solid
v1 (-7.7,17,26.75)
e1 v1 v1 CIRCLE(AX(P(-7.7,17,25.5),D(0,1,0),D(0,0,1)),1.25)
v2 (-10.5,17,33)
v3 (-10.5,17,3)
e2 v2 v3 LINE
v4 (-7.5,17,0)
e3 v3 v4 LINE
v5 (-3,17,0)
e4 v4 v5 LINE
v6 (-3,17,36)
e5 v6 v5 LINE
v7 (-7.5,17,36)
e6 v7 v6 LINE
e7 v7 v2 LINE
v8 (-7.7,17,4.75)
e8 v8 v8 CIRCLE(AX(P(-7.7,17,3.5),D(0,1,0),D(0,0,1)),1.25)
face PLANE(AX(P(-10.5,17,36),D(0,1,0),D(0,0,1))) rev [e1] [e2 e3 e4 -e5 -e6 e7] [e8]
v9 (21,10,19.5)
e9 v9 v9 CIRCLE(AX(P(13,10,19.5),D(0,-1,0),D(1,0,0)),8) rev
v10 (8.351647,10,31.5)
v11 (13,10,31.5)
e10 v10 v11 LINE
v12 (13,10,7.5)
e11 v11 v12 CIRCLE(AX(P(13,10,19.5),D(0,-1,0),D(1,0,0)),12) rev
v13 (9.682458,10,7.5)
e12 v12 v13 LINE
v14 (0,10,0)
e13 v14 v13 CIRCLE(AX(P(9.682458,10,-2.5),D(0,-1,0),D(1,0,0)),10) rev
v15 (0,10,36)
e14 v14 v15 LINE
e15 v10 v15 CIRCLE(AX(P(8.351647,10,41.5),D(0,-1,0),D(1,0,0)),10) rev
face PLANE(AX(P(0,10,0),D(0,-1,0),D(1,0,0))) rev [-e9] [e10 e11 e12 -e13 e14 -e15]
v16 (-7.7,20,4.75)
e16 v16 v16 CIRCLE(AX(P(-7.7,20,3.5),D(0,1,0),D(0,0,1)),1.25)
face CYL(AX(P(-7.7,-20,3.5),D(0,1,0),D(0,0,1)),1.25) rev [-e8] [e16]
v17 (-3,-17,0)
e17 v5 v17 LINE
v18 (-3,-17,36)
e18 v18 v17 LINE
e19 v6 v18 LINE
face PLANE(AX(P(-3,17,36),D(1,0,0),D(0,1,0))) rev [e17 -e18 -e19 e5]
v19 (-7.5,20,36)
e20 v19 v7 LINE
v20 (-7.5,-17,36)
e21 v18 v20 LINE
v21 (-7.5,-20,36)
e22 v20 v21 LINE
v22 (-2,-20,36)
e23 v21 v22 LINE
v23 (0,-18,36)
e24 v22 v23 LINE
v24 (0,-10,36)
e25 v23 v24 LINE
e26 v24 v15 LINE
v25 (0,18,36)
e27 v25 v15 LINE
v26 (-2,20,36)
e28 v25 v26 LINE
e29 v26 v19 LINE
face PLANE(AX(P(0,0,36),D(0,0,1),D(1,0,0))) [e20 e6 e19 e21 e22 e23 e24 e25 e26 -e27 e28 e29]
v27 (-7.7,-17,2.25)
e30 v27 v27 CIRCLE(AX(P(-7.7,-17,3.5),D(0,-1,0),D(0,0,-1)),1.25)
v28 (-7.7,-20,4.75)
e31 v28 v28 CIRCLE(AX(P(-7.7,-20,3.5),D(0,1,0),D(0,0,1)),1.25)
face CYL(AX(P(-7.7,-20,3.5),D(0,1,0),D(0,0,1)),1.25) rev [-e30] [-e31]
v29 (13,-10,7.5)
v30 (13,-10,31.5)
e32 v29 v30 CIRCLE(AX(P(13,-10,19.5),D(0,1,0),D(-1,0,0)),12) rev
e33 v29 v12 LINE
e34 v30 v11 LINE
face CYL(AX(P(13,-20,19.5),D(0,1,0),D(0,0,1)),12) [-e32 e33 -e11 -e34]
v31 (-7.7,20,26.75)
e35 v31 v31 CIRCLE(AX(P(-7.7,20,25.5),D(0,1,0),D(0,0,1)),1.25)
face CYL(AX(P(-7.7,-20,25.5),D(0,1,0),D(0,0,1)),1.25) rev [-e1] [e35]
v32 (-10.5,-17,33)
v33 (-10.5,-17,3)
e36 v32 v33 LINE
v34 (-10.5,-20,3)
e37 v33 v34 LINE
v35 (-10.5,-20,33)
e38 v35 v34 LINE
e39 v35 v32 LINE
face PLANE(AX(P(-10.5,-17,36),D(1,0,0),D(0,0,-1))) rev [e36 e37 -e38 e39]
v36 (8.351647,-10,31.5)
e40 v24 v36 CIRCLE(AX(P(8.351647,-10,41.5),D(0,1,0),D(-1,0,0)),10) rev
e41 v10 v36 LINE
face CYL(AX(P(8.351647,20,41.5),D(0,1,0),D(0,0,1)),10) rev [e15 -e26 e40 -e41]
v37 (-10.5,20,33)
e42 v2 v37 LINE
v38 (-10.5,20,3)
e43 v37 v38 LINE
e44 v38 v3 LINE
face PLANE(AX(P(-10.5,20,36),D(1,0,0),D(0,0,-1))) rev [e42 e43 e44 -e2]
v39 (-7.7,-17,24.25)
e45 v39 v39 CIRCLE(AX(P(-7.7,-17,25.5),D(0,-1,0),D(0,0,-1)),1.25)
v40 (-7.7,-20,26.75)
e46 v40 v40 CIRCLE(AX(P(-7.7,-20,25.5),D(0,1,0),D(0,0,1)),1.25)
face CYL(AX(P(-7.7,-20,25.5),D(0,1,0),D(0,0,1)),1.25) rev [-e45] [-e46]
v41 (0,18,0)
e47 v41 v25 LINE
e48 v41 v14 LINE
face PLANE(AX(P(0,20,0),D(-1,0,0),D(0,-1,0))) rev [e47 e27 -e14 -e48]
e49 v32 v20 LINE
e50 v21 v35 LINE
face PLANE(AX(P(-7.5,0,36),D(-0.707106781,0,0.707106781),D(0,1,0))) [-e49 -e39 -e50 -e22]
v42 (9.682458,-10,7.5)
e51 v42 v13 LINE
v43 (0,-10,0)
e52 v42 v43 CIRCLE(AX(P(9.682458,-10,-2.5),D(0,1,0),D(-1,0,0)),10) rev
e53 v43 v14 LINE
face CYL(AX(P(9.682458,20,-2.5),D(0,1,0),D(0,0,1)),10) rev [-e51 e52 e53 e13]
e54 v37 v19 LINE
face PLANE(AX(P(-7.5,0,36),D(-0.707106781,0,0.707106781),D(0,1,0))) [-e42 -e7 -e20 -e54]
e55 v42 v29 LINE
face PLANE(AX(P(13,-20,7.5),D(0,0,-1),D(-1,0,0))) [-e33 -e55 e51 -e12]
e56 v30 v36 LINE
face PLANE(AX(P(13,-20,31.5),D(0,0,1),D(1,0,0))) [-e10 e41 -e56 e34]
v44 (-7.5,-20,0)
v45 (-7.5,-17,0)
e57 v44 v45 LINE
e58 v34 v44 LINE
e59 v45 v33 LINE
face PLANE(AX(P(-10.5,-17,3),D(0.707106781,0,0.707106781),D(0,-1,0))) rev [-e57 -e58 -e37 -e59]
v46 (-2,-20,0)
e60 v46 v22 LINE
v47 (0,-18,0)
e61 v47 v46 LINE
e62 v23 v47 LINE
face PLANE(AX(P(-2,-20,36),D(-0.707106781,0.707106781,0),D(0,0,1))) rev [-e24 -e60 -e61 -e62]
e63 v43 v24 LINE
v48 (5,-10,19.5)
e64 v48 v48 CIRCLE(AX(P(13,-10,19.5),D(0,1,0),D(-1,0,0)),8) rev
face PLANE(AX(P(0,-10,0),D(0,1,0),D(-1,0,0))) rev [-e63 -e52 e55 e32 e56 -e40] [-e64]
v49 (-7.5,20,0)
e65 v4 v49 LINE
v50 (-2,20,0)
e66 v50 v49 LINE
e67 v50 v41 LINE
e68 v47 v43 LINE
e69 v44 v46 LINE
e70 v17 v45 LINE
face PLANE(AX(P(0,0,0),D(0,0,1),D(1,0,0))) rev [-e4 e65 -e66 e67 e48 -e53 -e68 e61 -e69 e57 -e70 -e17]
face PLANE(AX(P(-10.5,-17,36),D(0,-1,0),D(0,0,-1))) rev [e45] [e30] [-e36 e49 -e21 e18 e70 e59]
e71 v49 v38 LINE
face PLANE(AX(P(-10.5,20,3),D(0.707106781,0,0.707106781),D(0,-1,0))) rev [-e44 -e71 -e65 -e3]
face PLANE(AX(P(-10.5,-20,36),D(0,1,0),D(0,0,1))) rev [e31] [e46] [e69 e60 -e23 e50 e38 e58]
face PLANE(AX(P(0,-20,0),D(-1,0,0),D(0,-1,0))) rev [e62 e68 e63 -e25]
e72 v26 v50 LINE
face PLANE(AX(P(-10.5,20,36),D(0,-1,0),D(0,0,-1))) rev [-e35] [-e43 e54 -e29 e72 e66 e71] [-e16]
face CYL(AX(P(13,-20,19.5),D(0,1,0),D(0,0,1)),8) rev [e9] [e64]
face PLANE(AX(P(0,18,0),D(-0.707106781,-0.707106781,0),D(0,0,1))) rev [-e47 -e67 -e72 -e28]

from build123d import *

# Parameters (mm, degrees)
BOSS_EXTRUDE1_DEPTH = 36
SKETCH2_R           = 1.25
CUT_EXTRUDE1_DEPTH  = 55.829280499
CHAMFER1_SIZE       = 3
SKETCH4_R           = 8
BOSS_EXTRUDE2_DEPTH = 40
FILLET1_R           = 10
SKETCH5_W           = 25
SKETCH5_H           = 10
CUT_EXTRUDE3_DEPTH  = 49.176757882
CHAMFER2_SIZE       = 2


with BuildPart() as part:
    # Sketch1 → Boss-Extrude1 (new body)
    with BuildSketch(Plane.XY):
        Polygon((-10.5, 17), (-3, 17), (-3, -17), (-10.5, -17), (-10.5, -20), (0, -20), (0, 20), (-10.5, 20), align=None)
    extrude(amount=BOSS_EXTRUDE1_DEPTH)

    # Sketch2 → Cut-Extrude1 (cut, through all)
    with BuildSketch(Plane(origin=(0, 20, 0), x_dir=(1, 0, 0), z_dir=(0, 1, 0))):
        with Locations(Location((-7.7, -3.5, 0), (0, 0, 270))):
            Circle(SKETCH2_R)
        with Locations(Location((-7.7, -25.5, 0), (0, 0, 270))):
            Circle(SKETCH2_R)
    extrude(amount=-CUT_EXTRUDE1_DEPTH, mode=Mode.SUBTRACT)

    # Chamfer1
    chamfer1_edges = [part.edges().sort_by_distance(p)[0] for p in [
        (-10.5, 18.5, 0),
        (-10.5, -18.5, 36),
        (-10.5, 18.5, 36),
        (-10.5, -18.5, 0),
    ]]
    chamfer(chamfer1_edges, length=CHAMFER1_SIZE)

    # Sketch4 → Boss-Extrude2 (add, through all)
    with BuildSketch(Plane(origin=(0, 20, 0), x_dir=(1, 0, 0), z_dir=(0, 1, 0))):
        with BuildLine():
            Line((13, -7.5), (0, -7.5))
            Line((0, -7.5), (0, -31.5))
            Line((0, -31.5), (13, -31.5))
            ThreePointArc((13, -31.5), (25, -19.5), (13, -7.5))
        make_face()
        with Locations(Location((13, -19.5, 0), (0, 0, 270))):
            Circle(SKETCH4_R, mode=Mode.SUBTRACT)
    extrude(amount=-BOSS_EXTRUDE2_DEPTH)

    # Fillet1
    # the kernel refuses this fillet: 10 mm, written as the material it adds along each edge
    with BuildSketch(Plane(origin=(0, 20, 7.5), x_dir=(0, 0, -1), z_dir=(0, -1, 0))) as fillet1_piece_1:
        with BuildLine():
            CenterArc((10, 9.682458366), FILLET1_R, 180, 75.522487814)
            Line((0, 9.682458366), (-0.2, 9.682458366))
            Line((-0.2, 9.682458366), (-0.2, 0))
            Line((-0.2, 0), (0, -0.2))
            ThreePointArc((0, -0.2), (3.75, -0.2), (7.45, -0.193649167))
            Line((7.45, -0.193649167), (7.5, 0))
        make_face()
    extrude(amount=40)
    with BuildSketch(Plane(origin=(0, 20, 31.5), x_dir=(1.5375725384245926e-12, 0, 1.0), z_dir=(0, -1, 0))) as fillet1_piece_2:
        with BuildLine():
            CenterArc((10, -8.351646544), FILLET1_R, 123.367012969, 56.632987031)
            Line((0, -8.351646544), (-0.2, -8.351646544))
            Line((-0.2, -8.351646544), (-0.2, 0))
            Line((-0.2, 0), (0, 0.2))
            ThreePointArc((0, 0.2), (2.25, 0.2), (4.39, 0.167032931))
            Line((4.39, 0.167032931), (4.5, 0))
        make_face()
    extrude(amount=40)

    # Sketch5 → Cut-Extrude3 (cut, through all)
    with BuildSketch(Plane.XY.offset(36)):
        with Locations((12.5, 15)):
            Rectangle(SKETCH5_W, SKETCH5_H)
        with Locations((12.5, -15)):
            Rectangle(SKETCH5_W, SKETCH5_H)
    extrude(amount=-CUT_EXTRUDE3_DEPTH, mode=Mode.SUBTRACT)

    # Chamfer2
    chamfer2_edges = [part.edges().sort_by_distance(p)[0] for p in [
        (0, 20, 18),
        (0, -20, 18),
    ]]
    chamfer(chamfer2_edges, length=CHAMFER2_SIZE)


solid = part.part
